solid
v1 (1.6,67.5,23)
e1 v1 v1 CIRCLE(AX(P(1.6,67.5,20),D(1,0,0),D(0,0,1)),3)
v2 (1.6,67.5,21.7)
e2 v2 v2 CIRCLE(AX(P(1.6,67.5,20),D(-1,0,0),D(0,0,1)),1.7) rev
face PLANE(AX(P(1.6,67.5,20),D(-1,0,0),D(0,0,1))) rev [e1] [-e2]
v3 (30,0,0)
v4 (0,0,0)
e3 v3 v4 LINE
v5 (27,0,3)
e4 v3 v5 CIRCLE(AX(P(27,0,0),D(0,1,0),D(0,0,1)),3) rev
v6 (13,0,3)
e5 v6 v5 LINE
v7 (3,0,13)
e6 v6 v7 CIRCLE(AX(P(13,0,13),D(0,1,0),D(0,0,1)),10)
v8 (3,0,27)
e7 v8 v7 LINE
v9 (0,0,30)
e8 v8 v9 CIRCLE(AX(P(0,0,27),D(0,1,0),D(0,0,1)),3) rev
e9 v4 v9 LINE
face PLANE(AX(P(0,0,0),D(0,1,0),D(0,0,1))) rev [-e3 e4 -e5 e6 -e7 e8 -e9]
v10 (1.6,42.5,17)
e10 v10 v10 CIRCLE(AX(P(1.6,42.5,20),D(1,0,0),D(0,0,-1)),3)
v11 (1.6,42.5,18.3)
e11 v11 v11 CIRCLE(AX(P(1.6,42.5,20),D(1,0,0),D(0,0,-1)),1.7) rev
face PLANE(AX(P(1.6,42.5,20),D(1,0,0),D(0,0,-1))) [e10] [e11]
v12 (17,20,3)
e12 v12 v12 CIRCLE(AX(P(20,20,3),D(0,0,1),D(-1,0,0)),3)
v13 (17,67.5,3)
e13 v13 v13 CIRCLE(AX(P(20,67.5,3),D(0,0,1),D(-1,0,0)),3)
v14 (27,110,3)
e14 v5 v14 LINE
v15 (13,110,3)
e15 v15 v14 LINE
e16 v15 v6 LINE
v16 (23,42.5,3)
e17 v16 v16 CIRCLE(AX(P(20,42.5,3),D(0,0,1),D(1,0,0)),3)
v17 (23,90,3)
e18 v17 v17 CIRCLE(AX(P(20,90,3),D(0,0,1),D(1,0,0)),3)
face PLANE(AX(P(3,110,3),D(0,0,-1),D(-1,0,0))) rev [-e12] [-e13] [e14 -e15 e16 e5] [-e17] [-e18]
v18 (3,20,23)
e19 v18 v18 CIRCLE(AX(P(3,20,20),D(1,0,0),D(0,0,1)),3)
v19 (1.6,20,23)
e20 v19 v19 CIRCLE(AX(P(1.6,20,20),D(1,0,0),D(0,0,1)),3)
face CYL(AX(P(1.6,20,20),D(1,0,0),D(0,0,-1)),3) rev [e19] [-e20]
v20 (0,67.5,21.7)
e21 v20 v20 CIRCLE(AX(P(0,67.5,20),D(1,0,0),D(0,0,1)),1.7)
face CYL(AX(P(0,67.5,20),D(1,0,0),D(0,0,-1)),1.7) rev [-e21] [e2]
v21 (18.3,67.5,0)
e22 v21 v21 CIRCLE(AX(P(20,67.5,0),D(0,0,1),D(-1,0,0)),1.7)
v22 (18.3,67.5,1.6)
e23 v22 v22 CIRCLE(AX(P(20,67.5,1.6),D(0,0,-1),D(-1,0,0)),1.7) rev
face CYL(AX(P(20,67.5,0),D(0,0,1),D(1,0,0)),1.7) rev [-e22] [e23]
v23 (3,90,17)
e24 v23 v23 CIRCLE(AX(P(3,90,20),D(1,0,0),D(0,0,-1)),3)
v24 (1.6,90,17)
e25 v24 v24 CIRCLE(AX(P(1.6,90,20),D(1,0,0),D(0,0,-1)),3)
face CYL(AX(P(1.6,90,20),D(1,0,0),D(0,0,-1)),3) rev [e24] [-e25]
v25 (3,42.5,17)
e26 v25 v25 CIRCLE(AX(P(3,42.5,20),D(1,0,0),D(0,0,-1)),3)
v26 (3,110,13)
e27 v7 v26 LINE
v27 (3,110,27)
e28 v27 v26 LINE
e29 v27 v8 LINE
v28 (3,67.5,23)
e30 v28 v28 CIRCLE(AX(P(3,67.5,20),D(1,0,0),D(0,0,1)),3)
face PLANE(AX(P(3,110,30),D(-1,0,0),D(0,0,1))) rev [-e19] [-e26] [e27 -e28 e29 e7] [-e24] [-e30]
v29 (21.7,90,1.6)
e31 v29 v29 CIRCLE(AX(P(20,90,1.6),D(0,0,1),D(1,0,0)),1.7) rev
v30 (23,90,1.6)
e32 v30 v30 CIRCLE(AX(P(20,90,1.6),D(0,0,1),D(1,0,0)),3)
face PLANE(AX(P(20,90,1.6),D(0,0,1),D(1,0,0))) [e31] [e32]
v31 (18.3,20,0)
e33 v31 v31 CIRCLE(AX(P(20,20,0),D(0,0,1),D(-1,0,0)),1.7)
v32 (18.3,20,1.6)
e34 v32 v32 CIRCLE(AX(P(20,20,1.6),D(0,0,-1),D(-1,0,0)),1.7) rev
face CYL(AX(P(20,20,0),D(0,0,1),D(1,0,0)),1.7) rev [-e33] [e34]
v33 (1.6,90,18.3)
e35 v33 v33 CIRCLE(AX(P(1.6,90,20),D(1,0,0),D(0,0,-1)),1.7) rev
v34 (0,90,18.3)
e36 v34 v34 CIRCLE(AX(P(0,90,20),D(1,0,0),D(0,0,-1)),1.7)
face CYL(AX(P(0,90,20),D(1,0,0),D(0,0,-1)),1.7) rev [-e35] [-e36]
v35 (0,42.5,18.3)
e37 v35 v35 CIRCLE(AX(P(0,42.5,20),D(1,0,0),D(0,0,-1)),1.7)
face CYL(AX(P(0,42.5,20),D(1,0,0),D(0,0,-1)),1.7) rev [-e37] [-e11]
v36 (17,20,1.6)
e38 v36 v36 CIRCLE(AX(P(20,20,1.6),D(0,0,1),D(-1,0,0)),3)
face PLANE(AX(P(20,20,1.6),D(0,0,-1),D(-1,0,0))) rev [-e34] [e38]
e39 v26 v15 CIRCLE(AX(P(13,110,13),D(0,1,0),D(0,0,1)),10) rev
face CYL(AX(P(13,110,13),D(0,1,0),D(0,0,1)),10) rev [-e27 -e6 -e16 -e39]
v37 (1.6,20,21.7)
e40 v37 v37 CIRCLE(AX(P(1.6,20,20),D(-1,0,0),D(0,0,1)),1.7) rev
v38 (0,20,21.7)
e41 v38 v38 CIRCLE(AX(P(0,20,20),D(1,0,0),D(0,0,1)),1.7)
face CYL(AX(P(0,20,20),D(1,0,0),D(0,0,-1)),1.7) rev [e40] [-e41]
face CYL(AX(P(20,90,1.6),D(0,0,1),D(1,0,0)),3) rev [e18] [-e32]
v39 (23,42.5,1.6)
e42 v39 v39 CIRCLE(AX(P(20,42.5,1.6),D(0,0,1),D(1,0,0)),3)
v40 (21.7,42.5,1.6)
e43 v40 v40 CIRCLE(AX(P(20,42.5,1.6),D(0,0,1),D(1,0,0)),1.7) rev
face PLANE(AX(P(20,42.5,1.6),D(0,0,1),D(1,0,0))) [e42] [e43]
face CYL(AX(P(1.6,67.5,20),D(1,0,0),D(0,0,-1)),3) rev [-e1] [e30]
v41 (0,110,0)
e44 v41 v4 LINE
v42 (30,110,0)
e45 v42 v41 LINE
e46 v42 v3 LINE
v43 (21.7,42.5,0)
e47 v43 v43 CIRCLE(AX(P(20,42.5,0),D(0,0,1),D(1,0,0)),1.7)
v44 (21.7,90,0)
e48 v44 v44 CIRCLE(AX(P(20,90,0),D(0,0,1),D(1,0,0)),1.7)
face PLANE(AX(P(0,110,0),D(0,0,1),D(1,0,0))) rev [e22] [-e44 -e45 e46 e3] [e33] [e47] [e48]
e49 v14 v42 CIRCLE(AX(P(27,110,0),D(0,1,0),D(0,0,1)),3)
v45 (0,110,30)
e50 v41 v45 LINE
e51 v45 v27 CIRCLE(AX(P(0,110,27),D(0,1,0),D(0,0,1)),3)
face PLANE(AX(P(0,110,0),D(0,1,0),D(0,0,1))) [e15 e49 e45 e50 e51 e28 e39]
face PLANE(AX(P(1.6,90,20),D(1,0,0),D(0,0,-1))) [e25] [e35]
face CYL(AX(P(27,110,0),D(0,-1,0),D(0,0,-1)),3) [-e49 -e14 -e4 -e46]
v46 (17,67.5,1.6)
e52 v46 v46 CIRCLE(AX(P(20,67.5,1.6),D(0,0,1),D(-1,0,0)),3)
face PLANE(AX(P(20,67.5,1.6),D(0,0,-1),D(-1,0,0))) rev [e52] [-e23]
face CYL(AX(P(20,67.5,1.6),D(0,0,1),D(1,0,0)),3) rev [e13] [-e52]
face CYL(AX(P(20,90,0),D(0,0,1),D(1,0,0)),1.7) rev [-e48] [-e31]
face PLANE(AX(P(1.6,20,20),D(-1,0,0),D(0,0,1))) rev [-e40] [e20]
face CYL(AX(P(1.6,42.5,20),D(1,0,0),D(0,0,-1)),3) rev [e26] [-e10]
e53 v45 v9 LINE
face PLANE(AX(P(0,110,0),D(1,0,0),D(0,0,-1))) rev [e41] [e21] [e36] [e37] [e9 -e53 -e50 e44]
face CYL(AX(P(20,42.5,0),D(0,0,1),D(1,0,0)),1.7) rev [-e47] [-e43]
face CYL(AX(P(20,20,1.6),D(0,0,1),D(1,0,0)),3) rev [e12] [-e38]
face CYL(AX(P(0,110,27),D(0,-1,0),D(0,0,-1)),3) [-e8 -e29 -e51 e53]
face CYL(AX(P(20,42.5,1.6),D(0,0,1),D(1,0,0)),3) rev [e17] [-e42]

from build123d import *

# Parameters (mm, degrees)
BOSS_EXTRUDE1_DEPTH = 110
FILLET1_R           = 10
FILLET2_R           = 3
SKETCH2_R           = 1.7
CUT_EXTRUDE1_DEPTH  = 118.170815479
SKETCH3_R           = 1.7
CUT_EXTRUDE2_DEPTH  = 118.170815479
SKETCH4_R           = 3
CUT_EXTRUDE3_DEPTH  = 1.4
SKETCH5_R           = 3
CUT_EXTRUDE4_DEPTH  = 1.4


with BuildPart() as part:
    # Sketch1 → Boss-Extrude1 (new body)
    with BuildSketch(Plane(origin=(0, 0, 0), x_dir=(1, 0, 0), z_dir=(0, 1, 0))):
        Polygon((0, 0), (0, -30), (3, -30), (3, -3), (30, -3), (30, 0), align=None)
    extrude(amount=BOSS_EXTRUDE1_DEPTH)

    # Fillet1
    fillet1_edges = [part.edges().sort_by_distance(p)[0] for p in [
        (3, 55, 3),
    ]]
    fillet(fillet1_edges, radius=FILLET1_R)

    # Fillet2
    fillet2_edges = [part.edges().sort_by_distance(p)[0] for p in [
        (3, 55, 30),
        (30, 55, 3),
    ]]
    fillet(fillet2_edges, radius=FILLET2_R - 0.0001)  # a hair under: the kernel refuses the full size

    # Sketch2 → Cut-Extrude1 (cut, through all)
    with BuildSketch(Plane.XY.offset(3)):
        with Locations((20, 90)):
            Circle(SKETCH2_R)
        with Locations(Location((20, 67.5, 0), (0, 0, 180))):
            Circle(SKETCH2_R)
        with Locations((20, 42.5)):
            Circle(SKETCH2_R)
        with Locations(Location((20, 20, 0), (0, 0, 180))):
            Circle(SKETCH2_R)
    extrude(amount=-CUT_EXTRUDE1_DEPTH, mode=Mode.SUBTRACT)

    # Sketch3 → Cut-Extrude2 (cut, through all)
    with BuildSketch(Plane(origin=(3, 0, 0), x_dir=(0, 0, -1), z_dir=(1, 0, 0))):
        with Locations((-20, 90)):
            Circle(SKETCH3_R)
        with Locations(Location((-20, 67.5, 0), (0, 0, 180))):
            Circle(SKETCH3_R)
        with Locations((-20, 42.5)):
            Circle(SKETCH3_R)
        with Locations(Location((-20, 20, 0), (0, 0, 180))):
            Circle(SKETCH3_R)
    extrude(amount=-CUT_EXTRUDE2_DEPTH, mode=Mode.SUBTRACT)

    # Sketch4 → Cut-Extrude3 (cut)
    with BuildSketch(Plane.XY.offset(3)):
        with Locations((20, 90)):
            Circle(SKETCH4_R)
        with Locations(Location((20, 67.5, 0), (0, 0, 180))):
            Circle(SKETCH4_R)
        with Locations((20, 42.5)):
            Circle(SKETCH4_R)
        with Locations(Location((20, 20, 0), (0, 0, 180))):
            Circle(SKETCH4_R)
    extrude(amount=-CUT_EXTRUDE3_DEPTH, mode=Mode.SUBTRACT)

    # Sketch5 → Cut-Extrude4 (cut)
    with BuildSketch(Plane(origin=(3, 0, 0), x_dir=(0, 0, -1), z_dir=(1, 0, 0))):
        with Locations((-20, 90)):
            Circle(SKETCH5_R)
        with Locations(Location((-20, 67.5, 0), (0, 0, 180))):
            Circle(SKETCH5_R)
        with Locations((-20, 42.5)):
            Circle(SKETCH5_R)
        with Locations(Location((-20, 20, 0), (0, 0, 180))):
            Circle(SKETCH5_R)
    extrude(amount=-CUT_EXTRUDE4_DEPTH, mode=Mode.SUBTRACT)


solid = part.part
